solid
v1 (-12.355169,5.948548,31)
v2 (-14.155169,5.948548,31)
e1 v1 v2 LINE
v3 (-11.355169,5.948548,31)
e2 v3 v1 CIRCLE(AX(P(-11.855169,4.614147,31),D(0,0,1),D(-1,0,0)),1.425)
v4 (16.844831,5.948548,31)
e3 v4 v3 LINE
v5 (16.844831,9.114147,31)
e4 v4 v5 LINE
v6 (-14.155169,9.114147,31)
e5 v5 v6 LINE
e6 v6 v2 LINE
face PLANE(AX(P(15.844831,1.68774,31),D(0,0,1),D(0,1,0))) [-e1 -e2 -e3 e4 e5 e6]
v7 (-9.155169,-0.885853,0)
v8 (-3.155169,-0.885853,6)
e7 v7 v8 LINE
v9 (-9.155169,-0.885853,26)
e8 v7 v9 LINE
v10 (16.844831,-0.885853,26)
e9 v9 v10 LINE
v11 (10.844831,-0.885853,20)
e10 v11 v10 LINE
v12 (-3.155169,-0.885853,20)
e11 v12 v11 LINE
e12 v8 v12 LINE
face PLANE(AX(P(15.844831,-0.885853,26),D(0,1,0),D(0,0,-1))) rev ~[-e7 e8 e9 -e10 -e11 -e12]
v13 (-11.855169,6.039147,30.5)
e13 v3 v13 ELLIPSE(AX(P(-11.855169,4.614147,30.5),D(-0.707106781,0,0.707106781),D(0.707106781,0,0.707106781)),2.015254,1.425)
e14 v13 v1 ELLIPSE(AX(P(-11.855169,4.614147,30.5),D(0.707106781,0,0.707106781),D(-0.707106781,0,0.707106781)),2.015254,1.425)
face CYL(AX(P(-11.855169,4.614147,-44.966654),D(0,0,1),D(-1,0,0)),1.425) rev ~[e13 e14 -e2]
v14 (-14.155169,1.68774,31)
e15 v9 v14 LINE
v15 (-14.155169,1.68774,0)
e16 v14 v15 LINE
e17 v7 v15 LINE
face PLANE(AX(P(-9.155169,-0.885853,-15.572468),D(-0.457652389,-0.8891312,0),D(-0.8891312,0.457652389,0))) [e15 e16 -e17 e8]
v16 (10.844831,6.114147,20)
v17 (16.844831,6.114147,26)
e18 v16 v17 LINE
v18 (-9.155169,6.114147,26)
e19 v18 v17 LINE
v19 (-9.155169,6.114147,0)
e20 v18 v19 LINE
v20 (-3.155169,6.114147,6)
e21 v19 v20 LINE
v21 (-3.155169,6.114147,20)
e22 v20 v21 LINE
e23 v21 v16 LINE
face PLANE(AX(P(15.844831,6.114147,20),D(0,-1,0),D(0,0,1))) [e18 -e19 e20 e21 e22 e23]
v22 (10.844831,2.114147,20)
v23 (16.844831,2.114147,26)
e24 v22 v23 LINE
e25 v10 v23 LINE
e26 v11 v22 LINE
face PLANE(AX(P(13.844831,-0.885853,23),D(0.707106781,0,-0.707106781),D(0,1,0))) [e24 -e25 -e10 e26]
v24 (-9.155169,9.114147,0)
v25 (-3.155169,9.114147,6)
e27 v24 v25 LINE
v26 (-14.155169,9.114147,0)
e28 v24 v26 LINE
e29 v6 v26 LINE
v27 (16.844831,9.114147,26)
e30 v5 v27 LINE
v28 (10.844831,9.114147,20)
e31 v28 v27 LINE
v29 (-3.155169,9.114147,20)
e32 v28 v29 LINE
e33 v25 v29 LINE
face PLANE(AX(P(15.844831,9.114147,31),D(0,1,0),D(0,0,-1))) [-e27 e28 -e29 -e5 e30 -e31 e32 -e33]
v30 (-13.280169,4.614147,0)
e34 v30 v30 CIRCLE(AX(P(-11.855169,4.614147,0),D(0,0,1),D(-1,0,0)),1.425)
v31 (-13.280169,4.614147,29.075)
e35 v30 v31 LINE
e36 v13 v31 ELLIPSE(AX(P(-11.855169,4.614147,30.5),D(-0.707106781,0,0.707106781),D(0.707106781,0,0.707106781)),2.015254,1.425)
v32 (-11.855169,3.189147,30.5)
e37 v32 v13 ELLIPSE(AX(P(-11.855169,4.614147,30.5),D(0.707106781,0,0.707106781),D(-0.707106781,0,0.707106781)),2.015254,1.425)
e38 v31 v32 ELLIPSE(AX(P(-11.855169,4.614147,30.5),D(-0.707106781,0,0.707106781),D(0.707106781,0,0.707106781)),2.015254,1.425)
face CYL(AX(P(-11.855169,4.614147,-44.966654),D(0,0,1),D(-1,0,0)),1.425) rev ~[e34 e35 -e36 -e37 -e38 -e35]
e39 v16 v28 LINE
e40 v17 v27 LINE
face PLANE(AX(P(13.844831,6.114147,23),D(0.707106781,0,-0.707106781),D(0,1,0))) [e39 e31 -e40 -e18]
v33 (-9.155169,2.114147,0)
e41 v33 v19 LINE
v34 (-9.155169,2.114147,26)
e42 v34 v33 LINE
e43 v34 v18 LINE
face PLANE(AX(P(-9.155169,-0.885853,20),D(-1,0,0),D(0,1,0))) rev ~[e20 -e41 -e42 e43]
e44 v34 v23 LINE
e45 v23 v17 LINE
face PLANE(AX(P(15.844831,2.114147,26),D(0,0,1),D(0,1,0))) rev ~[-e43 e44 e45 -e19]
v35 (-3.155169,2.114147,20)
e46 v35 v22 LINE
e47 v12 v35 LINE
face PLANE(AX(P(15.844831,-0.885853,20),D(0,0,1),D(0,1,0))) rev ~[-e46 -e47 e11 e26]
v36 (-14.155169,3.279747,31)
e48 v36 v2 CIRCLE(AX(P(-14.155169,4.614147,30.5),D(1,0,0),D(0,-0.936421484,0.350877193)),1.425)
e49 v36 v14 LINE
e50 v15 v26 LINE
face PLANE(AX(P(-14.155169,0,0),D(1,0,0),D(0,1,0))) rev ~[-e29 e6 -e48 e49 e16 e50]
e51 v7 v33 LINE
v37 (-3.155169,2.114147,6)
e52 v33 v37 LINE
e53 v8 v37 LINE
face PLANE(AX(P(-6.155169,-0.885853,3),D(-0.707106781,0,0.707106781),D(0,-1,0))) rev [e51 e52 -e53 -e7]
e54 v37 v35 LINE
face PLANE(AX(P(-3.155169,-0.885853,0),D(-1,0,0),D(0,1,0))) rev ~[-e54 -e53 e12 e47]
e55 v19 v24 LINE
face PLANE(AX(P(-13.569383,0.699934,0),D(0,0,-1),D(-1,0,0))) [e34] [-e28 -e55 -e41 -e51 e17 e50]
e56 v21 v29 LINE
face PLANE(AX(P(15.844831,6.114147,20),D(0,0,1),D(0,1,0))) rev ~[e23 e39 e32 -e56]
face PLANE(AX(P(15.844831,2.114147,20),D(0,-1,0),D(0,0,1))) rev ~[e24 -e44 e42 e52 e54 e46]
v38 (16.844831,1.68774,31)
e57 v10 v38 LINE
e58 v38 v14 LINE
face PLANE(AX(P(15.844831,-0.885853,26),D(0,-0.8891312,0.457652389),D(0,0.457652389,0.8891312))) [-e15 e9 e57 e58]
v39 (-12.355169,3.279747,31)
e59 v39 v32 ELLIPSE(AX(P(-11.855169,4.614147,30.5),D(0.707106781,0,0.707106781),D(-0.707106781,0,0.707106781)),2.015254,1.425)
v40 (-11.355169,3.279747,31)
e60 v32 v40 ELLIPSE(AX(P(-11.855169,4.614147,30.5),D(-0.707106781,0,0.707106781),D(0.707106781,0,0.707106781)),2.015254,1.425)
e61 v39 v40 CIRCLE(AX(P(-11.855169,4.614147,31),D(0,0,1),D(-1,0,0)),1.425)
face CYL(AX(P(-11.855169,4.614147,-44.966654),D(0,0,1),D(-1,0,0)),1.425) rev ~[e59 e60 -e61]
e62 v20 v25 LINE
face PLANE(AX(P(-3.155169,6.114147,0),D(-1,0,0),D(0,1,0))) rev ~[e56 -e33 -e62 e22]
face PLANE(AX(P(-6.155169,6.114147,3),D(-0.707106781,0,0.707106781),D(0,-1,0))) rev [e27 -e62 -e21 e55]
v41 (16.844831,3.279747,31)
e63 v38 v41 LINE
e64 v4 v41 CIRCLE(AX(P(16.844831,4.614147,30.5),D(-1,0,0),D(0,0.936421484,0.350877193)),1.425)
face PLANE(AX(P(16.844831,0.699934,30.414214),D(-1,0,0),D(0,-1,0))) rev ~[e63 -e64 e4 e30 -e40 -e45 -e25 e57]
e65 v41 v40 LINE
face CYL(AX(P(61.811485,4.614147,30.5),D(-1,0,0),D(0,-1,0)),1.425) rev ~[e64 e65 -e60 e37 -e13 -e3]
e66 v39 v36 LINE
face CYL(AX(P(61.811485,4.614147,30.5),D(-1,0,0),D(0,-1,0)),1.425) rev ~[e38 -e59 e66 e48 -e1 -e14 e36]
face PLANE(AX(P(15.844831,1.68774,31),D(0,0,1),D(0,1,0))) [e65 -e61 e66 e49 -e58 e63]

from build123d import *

# Parameters (mm, degrees)
F1_DEPTH      = 20
F2_W          = 7
F2_H          = 20
F3_DEPTH      = 2
F5_DEPTH      = 6
F6_W          = 3
F6_H          = 6
F7_DEPTH      = 25
F8_DEPTH      = 3
F12_DEPTH     = 2
F13_DEPTH     = 11
F14_T4_DEPTH  = 29
F14_T10_DEPTH = 28
F14_T17_DEPTH = 38.2867319519
F14_T24_DEPTH = 39.2867319519
F15_T1_DEPTH  = 61.1449358039
F15_T3_DEPTH  = 60.1449358039
F16_DEPTH     = 1
F17_SIZE      = 6
F20_D         = 2.85
F20_ON_F18_D  = 2.85


# Not quite as in the source:
# - a fillet or chamfer that OpenCascade refuses, or shapes differently, is made with other operations: its cross-section is extruded or revolved along the edge and cut away or added


with BuildPart() as f1:
    # F0 (on Top) → F1 (new body)
    with BuildSketch(Plane.XY):
        Polygon((-3.1551690071, 9.1141472052), (-12.1551690071, 9.1141472052), (-12.1551690071, -0.8858527948), (-3.1551690071, -0.8858527948), (-3.1551690071, 2.1141472052), (-9.1551690071, 2.1141472052), (-9.1551690071, 6.1141472052), (-3.1551690071, 6.1141472052), align=None)
    extrude(amount=F1_DEPTH)

    # F2 (on face) → F3 (join)
    with BuildSketch(Plane(origin=(-12.1551690071, 0, 0), x_dir=(0, -1, 0), z_dir=(-1, 0, 0))):
        with Locations((-5.6141472052, 10)):
            Rectangle(F2_W, F2_H)
    extrude(amount=F3_DEPTH)

    # F4 (on face) → F5 (join)
    with BuildSketch(Plane.XY.offset(20)):
        Polygon((-12.1345976368, 9.1141472052), (-12.1551690071, 2.1141472052), (-12.1551690071, -0.8858527948), (-9.1551690071, -0.8858527948), (-9.1551690071, 2.1141472052), (-9.1551690071, 6.1141472052), (-9.1551690071, 9.1141472052), align=None)
    extrude(amount=F5_DEPTH)

    # F6 (on face) → F7 (join)
    with BuildSketch(Plane.YZ.offset(-9.1551690071)):
        with Locations((7.6141472052, 23)):
            Rectangle(F6_W, F6_H)
        with Locations((0.6141472052, 23)):
            Rectangle(F6_W, F6_H)
        Polygon((-0.8858527948, 26), (2.1141472052, 26), (6.1141472052, 26), (9.1141472052, 26), (9.1141472052, 29), (-0.8858527948, 29), align=None)
    extrude(amount=F7_DEPTH)

    # F8 (add): a face of the model
    f8_faces = [f1.faces().sort_by_distance(p)[0] for p in [
        (-10.6515768532, 4.1077318265, 26),
    ]]
    extrude(f8_faces, amount=F8_DEPTH)

    # F9: union 

    # F10: union 

    # F11 (on face) → F12 (join)
    with BuildSketch(Plane.XY.offset(29)):
        Polygon((-12.1345976368, 9.1141472052), (-12.1551690071, 2.1141472052), (15.8448309929, 2.1141472052), (15.8448309929, 9.1141472052), align=None)
    extrude(amount=F12_DEPTH)

    # F4 (on face) → F13 (join)
    with BuildSketch(Plane.XY.offset(20)):
        Polygon((-14.1551690071, 2.1141472052), (-12.1551690071, 2.1141472052), (-12.1345976368, 9.1141472052), (-14.1551690071, 9.1141472052), align=None)
    extrude(amount=F13_DEPTH)

    # F14: chamfer of 4 on 2 edges, made by hand


with BuildPart() as f14_tool2:
    # F14_s3 → F14_t4 (new body)
    with BuildSketch(Plane.XY):
        Polygon((-12.1551690071, -1.8858527948), (-16.1551690071, 2.1141472052), (-12.1551690071, 2.1141472052), align=None)
    extrude(amount=F14_T4_DEPTH)

    split(bisect_by=Plane.XZ.offset(0.8858527948), keep=Keep.BOTTOM)

    split(bisect_by=Plane.YZ.offset(-14.1551690071), keep=Keep.TOP)


with BuildPart() as f1_1:
    add(f1.part)

    # F14_t1: union F14_tool2
    add(f14_tool2.part)


with BuildPart() as f14_tool8:
    # F14_s9 → F14_t10 (new body)
    with BuildSketch(Plane.YZ.offset(-12.1551690071)):
        Polygon((-1.8858527948, 29), (2.1141472052, 33), (2.1141472052, 29), align=None)
    extrude(amount=F14_T10_DEPTH)

    split(bisect_by=Plane.XZ.offset(0.8858527948), keep=Keep.BOTTOM)

    split(bisect_by=Plane.XY.offset(31), keep=Keep.BOTTOM)


with BuildPart() as f1_2:
    add(f1_1.part)

    # F14_t7: union F14_tool8
    add(f14_tool8.part)


with BuildPart() as f14_tool15:
    # F14_s16 → F14_t17 (new body)
    with BuildSketch(Plane.YZ.offset(-22.4419009589)):
        Polygon((-1.8858527948, 29), (2.1141472052, 33), (2.1141472052, 29), align=None)
    extrude(amount=F14_T17_DEPTH)

    split(bisect_by=Plane.XZ.offset(0.8858527948), keep=Keep.BOTTOM)

    split(bisect_by=Plane.YZ.offset(-12.1551690071), keep=Keep.BOTTOM)

    split(bisect_by=Plane.YZ.offset(-14.1551690071), keep=Keep.TOP)

    split(bisect_by=Plane.XY.offset(31), keep=Keep.BOTTOM)


with BuildPart() as f14_tool22:
    # F14_s23 → F14_t24 (new body)
    with BuildSketch(Plane.XY):
        Polygon((-12.1551690071, -1.8858527948), (-16.1551690071, 2.1141472052), (-12.1551690071, 2.1141472052), align=None)
    extrude(amount=F14_T24_DEPTH)

    split(bisect_by=Plane.XZ.offset(0.8858527948), keep=Keep.BOTTOM)

    split(bisect_by=Plane.XY.offset(29), keep=Keep.TOP)

    split(bisect_by=Plane.YZ.offset(-14.1551690071), keep=Keep.TOP)

    split(bisect_by=Plane.XY.offset(31), keep=Keep.BOTTOM)


with BuildPart() as f14_tool15_1:
    add(f14_tool15.part)

    # F14_t29: intersect F14_tool22
    add(f14_tool22.part, mode=Mode.INTERSECT)


with BuildPart() as f1_3:
    add(f1_2.part)

    # F14_t13: union F14_tool15
    add(f14_tool15_1.part)

    # F15: chamfer of 4 x 6 on 2 edges, made by hand

    # F15_s2 → F15_t1 (cut)
    with BuildSketch(Plane.XY.offset(-15.5724679019)):
        Polygon((-9.1551690071, -0.8858527948), (-17.3978096942, 3.3567878923), (-13.1551690071, -0.8858527948), align=None)
    extrude(amount=F15_T1_DEPTH, mode=Mode.SUBTRACT)

    # F15_s4 → F15_t3 (cut)
    with BuildSketch(Plane.YZ.offset(-28.7276369091)):
        Polygon((-0.8858527948, 26), (3.3567878923, 34.2426406871), (-0.8858527948, 30), align=None)
    extrude(amount=F15_T3_DEPTH, mode=Mode.SUBTRACT)

    # F16 (add): a face of the model
    f16_faces = [f1_3.faces().sort_by_distance(p)[0] for p in [
        (15.8448309929, 6.2628078927, 23),
    ]]
    extrude(f16_faces, amount=F16_DEPTH)

    # F17
    f17_edges = [f1_3.edges().sort_by_distance(p)[0] for p in [
        (-3.155169, 0.614147, 0),
        (-3.155169, 7.614147, 0),
        (16.844831, 0.614147, 20),
        (16.844831, 7.614147, 20),
    ]]
    chamfer(f17_edges, length=F17_SIZE)

    # F20 (through all)
    with Locations(Plane(origin=(0, 0, 0), x_dir=(1, 0, 0), z_dir=(0, 0, -1))):
        with Locations((-11.8551690071, -4.6141472052)):
            Hole(F20_D / 2)

    # F20 on F18 (through all)
    with Locations(Plane.YZ.offset(16.8448309929)):
        with Locations((4.6141472052, 30.5)):
            Hole(F20_ON_F18_D / 2)


solid = f1_3.part
